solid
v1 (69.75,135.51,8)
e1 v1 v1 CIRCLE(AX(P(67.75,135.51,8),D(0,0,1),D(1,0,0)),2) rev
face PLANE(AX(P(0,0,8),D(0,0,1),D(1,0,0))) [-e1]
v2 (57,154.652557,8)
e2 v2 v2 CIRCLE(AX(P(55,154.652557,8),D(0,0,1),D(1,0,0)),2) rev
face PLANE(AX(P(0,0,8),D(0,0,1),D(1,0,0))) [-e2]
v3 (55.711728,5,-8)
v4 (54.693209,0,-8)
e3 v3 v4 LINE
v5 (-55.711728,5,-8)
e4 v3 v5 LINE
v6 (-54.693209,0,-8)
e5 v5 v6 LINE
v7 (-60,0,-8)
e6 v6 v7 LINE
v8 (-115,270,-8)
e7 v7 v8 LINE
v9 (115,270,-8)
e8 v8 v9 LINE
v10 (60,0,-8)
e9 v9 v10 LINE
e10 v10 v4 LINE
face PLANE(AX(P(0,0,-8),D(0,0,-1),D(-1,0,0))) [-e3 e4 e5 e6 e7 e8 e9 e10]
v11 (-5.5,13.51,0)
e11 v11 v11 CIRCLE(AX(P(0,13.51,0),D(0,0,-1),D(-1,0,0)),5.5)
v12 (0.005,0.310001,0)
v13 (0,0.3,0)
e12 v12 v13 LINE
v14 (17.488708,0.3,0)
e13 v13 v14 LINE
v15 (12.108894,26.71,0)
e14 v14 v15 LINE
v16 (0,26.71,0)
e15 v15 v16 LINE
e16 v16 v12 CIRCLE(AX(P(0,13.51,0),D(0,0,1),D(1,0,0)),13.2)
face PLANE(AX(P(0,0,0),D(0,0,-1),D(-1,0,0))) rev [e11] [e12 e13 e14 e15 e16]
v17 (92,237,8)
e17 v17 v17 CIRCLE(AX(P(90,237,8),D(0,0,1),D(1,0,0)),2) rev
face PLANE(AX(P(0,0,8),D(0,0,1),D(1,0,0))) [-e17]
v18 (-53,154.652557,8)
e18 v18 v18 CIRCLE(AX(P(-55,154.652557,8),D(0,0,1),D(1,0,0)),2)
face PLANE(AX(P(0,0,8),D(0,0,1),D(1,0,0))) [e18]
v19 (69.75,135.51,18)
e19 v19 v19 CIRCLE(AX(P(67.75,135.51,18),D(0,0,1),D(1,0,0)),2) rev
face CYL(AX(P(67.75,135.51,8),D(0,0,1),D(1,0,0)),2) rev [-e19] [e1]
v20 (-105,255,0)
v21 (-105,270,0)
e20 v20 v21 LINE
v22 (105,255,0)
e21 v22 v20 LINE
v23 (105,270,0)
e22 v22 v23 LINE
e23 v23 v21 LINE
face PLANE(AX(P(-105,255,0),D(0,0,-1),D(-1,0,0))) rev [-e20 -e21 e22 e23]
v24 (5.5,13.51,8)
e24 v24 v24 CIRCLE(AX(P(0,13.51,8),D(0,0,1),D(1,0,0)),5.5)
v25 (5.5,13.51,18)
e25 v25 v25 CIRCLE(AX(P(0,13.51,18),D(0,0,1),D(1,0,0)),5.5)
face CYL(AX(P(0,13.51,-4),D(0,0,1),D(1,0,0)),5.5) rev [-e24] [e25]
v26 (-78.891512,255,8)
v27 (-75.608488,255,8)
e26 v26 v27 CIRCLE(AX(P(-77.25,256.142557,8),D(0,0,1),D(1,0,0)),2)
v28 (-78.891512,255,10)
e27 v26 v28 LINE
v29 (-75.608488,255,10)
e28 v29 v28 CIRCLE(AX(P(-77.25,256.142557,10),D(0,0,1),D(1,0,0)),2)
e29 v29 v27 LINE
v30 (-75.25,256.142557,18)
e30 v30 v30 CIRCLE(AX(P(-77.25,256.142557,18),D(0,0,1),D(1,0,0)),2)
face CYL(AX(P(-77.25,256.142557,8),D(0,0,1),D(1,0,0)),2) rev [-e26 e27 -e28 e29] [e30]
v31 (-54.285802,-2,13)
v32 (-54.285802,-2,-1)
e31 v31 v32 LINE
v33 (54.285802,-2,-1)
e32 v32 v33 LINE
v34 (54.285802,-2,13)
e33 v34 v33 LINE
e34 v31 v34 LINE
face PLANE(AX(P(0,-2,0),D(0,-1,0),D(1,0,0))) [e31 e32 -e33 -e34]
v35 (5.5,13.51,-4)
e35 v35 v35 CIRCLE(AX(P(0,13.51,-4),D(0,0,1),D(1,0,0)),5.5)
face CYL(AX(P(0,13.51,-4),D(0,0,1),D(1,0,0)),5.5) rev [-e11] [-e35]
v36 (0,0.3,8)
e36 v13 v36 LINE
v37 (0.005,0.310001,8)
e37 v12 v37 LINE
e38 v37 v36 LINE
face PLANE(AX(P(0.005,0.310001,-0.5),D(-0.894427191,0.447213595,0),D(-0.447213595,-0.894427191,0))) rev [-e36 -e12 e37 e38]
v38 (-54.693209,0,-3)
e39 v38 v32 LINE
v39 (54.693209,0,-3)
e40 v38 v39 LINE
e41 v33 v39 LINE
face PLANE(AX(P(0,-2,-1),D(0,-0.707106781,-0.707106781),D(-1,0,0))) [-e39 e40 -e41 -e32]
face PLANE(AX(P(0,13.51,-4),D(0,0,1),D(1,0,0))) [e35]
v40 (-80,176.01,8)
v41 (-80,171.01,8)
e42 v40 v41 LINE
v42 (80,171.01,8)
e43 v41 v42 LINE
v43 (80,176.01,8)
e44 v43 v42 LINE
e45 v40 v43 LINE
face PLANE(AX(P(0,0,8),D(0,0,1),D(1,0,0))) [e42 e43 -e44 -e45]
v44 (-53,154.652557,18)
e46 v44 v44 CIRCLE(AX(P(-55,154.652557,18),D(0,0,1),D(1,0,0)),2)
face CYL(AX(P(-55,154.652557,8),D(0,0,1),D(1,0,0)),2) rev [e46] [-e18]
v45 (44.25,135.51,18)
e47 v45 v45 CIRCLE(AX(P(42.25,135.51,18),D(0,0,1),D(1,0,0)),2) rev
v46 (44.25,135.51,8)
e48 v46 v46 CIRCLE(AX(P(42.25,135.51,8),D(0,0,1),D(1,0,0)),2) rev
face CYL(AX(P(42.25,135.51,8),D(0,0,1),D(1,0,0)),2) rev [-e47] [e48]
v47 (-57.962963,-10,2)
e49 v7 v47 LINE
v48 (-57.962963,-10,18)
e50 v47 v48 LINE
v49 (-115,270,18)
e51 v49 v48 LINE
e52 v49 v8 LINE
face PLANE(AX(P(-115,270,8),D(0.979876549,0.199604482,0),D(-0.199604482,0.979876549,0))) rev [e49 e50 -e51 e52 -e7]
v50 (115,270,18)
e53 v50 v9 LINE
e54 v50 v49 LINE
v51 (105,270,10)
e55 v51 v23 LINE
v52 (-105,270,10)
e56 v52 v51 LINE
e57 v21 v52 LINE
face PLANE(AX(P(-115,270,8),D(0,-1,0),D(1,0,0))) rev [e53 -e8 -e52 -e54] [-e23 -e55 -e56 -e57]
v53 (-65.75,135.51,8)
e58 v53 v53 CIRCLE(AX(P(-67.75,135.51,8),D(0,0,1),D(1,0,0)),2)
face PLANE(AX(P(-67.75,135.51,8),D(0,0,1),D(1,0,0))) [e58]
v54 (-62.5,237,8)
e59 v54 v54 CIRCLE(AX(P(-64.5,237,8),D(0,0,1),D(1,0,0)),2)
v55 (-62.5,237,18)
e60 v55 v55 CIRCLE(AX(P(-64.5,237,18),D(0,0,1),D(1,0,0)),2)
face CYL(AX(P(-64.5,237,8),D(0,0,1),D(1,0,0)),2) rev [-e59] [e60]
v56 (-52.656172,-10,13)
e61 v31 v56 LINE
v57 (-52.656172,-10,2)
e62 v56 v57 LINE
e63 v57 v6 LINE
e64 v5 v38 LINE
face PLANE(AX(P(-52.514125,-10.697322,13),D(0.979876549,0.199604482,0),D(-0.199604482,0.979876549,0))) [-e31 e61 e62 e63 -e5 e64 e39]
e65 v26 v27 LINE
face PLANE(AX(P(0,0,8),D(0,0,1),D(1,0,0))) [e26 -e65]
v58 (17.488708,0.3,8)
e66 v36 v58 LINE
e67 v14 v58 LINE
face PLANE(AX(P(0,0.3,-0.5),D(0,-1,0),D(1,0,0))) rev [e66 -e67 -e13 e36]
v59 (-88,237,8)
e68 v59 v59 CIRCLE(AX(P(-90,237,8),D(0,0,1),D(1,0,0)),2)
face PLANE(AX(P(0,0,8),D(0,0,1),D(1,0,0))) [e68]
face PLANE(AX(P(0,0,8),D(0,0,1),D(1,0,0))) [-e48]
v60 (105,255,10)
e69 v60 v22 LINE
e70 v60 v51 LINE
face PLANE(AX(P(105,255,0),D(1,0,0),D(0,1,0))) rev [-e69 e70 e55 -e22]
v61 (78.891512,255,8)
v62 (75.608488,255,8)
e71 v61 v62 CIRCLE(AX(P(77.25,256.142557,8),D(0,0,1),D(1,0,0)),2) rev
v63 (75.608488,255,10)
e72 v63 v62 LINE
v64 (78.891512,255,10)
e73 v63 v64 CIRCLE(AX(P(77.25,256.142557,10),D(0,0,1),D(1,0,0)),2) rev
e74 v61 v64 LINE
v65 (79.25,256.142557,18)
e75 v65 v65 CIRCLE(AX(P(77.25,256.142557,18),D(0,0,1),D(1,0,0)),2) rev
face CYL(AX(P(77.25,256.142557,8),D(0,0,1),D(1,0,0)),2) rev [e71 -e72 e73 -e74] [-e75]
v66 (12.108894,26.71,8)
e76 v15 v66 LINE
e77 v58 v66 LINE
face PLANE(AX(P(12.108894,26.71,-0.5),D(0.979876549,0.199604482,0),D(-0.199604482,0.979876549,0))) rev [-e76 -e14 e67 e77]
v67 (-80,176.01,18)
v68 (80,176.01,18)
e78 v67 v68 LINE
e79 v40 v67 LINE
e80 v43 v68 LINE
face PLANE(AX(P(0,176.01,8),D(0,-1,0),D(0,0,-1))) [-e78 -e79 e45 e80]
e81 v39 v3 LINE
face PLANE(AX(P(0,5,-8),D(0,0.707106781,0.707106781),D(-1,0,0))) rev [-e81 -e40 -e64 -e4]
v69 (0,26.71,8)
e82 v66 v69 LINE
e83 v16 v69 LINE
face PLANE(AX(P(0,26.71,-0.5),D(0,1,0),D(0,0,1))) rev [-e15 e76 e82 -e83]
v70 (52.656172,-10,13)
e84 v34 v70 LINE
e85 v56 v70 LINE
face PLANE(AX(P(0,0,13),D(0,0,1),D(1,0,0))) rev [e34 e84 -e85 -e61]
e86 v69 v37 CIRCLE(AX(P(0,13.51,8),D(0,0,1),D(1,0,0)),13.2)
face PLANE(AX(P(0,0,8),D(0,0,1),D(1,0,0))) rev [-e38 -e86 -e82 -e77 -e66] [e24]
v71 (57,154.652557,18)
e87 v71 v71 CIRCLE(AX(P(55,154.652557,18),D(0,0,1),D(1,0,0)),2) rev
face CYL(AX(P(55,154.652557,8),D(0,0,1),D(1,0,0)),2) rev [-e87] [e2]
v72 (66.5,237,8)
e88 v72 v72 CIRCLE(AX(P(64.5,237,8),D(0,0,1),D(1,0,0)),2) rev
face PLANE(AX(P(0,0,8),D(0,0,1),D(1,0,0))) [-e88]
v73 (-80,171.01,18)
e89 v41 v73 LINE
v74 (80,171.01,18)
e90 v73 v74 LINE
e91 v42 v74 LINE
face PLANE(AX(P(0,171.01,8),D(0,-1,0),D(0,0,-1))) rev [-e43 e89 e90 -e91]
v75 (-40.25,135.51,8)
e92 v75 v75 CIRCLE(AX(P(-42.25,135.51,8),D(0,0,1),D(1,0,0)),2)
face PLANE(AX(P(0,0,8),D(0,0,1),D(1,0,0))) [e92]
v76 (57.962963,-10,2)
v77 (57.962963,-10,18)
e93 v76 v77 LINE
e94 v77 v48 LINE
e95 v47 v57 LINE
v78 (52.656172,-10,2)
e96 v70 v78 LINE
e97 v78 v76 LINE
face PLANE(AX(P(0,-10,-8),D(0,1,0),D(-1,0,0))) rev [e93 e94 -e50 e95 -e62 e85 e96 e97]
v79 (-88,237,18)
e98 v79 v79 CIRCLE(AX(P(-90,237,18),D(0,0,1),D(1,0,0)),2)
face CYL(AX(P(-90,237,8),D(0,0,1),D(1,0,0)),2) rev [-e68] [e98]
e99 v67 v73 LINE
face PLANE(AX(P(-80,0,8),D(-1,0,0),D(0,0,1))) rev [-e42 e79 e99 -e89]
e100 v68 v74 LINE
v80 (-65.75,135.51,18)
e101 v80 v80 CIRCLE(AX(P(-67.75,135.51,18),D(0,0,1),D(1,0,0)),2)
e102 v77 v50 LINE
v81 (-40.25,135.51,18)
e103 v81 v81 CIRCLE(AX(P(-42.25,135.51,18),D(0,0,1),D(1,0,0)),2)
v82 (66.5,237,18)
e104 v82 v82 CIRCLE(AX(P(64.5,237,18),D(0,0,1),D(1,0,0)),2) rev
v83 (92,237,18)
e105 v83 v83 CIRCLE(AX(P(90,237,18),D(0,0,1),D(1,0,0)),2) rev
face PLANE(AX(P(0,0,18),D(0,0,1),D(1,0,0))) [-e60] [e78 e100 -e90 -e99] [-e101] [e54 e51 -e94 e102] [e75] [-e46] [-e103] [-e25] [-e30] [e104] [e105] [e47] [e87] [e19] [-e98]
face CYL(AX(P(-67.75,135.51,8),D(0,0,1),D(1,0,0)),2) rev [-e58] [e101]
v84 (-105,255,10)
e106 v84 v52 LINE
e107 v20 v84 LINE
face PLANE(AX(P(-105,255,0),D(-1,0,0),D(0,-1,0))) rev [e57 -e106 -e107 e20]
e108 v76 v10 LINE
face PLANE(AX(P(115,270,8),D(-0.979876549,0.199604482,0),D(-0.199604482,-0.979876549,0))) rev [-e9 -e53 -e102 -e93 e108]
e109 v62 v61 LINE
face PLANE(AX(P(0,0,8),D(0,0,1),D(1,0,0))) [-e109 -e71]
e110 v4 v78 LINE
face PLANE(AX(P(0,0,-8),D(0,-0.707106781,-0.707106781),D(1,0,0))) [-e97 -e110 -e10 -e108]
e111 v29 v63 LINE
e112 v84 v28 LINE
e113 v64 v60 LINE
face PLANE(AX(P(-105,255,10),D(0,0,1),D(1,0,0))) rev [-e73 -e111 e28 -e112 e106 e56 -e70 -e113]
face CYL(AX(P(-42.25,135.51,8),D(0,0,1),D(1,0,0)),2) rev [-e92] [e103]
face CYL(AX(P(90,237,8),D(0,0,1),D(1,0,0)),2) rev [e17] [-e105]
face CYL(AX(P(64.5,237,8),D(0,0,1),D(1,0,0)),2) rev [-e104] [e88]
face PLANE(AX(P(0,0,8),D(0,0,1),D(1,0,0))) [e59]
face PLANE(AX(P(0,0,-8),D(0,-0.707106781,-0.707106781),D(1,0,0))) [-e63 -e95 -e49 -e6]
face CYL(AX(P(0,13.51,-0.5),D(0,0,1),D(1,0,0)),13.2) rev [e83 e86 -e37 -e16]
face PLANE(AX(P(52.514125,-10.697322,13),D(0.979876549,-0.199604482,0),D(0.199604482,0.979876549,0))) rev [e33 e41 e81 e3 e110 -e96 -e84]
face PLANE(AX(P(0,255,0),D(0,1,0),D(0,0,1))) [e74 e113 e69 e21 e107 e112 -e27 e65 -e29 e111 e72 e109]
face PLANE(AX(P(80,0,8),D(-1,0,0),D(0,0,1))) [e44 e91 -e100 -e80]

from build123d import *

# Parameters (mm, degrees)
EXTRUDE_1_DEPTH     = 8
CUT_EXTRUDE_1_DEPTH = 8.5
EXTRUDE_2_DEPTH     = 8
EXTRUDE_3_DEPTH     = 10
SKETCH_7_R          = 5.5
CUT_EXTRUDE_2_DEPTH = 22
EXTRUDE_5_DEPTH     = 26
CUT_EXTRUDE_4_DEPTH = 21
CHAMFER_6_SIZE      = 5
CHAMFER_8_SIZE      = 10
SKETCH_13_W         = 210
SKETCH_13_H         = 10
CUT_EXTRUDE_5_DEPTH = 15
SKETCH_14_W         = 160
SKETCH_14_H         = 5
CUT_EXTRUDE_6_DEPTH = 10
SKETCH_16_R         = 2
CUT_EXTRUDE_7_DEPTH = 10
SKETCH_18_W         = 109.386418102
SKETCH_18_H         = 16
EXTRUDE_7_DEPTH     = 2
CHAMFER_10_SIZE     = 2


with BuildPart() as part:
    # 草图1 → 凸台-拉伸1 (new body)
    with BuildSketch(Plane.XY):
        Polygon((-60, 0), (60, 0), (115, 270), (-115, 270), align=None)
    extrude(amount=EXTRUDE_1_DEPTH)

    # 草图2 → 切除-拉伸1 (cut)
    with BuildSketch(Plane.XY.offset(8)):
        with BuildLine():
            Line((0.005000474, 0.310000947), (0, 0.3))
            Line((0, 0.3), (17.48870838, 0.3))
            Line((17.48870838, 0.3), (12.108893566, 26.71))
            Line((12.108893566, 26.71), (0, 26.71))
            ThreePointArc((0, 26.71), (-13.199999763, 13.507499763), (0.005000474, 0.310000947))
        make_face()
    extrude(amount=-CUT_EXTRUDE_1_DEPTH, mode=Mode.SUBTRACT)

    # 草图5 → 凸台-拉伸2 (add)
    with BuildSketch(Plane(origin=(0, 0, 0), x_dir=(-1, 0, 0), z_dir=(0, 0, -1))):
        Polygon((60, 0), (115, 270), (-115, 270), (-60, 0), align=None)
    extrude(amount=EXTRUDE_2_DEPTH)

    # 草图6 → 凸台-拉伸3 (add)
    with BuildSketch(Plane.XY.offset(8)):
        Polygon((-115, 270), (-60, 0), (60, 0), (115, 270), align=None)
    extrude(amount=EXTRUDE_3_DEPTH)

    # 草图7 → 切除-拉伸2 (cut)
    with BuildSketch(Plane.XY.offset(18)):
        with Locations((0, 13.51)):
            Circle(SKETCH_7_R)
    extrude(amount=-CUT_EXTRUDE_2_DEPTH, mode=Mode.SUBTRACT)

    # 草图9 → 凸台-拉伸5 (add)
    with BuildSketch(Plane.XY.offset(18)):
        Polygon((-57.962962963, -10), (-60, 0), (60, 0), (57.962962963, -10), align=None)
    extrude(amount=-EXTRUDE_5_DEPTH)

    # 草图12 → 切除-拉伸4 (cut)
    with BuildSketch(Plane.XY.offset(-8)):
        Polygon((54.693209051, 0), (-54.693209051, 0), (-52.656172014, -10), (52.656172014, -10), align=None)
    extrude(amount=CUT_EXTRUDE_4_DEPTH, mode=Mode.SUBTRACT)

    # 倒角6
    chamfer_6_edges = [part.edges().sort_by_distance(p)[0] for p in [
        (0, 0, -8),
    ]]
    chamfer(chamfer_6_edges, length=CHAMFER_6_SIZE)

    # 倒角8
    chamfer_8_edges = [part.edges().sort_by_distance(p)[0] for p in [
        (55.309567488, -10, -8),
        (-55.309567488, -10, -8),
    ]]
    chamfer(chamfer_8_edges, length=CHAMFER_8_SIZE)

    # 草图13 → 切除-拉伸5 (cut)
    with BuildSketch(Plane(origin=(0, 270, 0), x_dir=(1, 0, 0), z_dir=(0, 1, 0))):
        with Locations((0, -5)):
            Rectangle(SKETCH_13_W, SKETCH_13_H)
    extrude(amount=-CUT_EXTRUDE_5_DEPTH, mode=Mode.SUBTRACT)

    # 草图14 → 切除-拉伸6 (cut)
    with BuildSketch(Plane.XY.offset(18)):
        with Locations((0, 173.51)):
            Rectangle(SKETCH_14_W, SKETCH_14_H)
    extrude(amount=-CUT_EXTRUDE_6_DEPTH, mode=Mode.SUBTRACT)

    # 草图16 → 切除-拉伸7 (cut)
    with BuildSketch(Plane.XY.offset(18)):
        with Locations((-77.25, 256.1425573)):
            Circle(SKETCH_16_R)
        with Locations((-90, 237)):
            Circle(SKETCH_16_R)
        with Locations((-64.5, 237)):
            Circle(SKETCH_16_R)
        with Locations((77.25, 256.1425573)):
            Circle(SKETCH_16_R)
        with Locations((64.5, 237)):
            Circle(SKETCH_16_R)
        with Locations((90, 237)):
            Circle(SKETCH_16_R)
        with Locations((-55, 154.6525573)):
            Circle(SKETCH_16_R)
        with Locations((-42.25, 135.51)):
            Circle(SKETCH_16_R)
        with Locations((55, 154.6525573)):
            Circle(SKETCH_16_R)
        with Locations((42.25, 135.51)):
            Circle(SKETCH_16_R)
        with Locations((67.75, 135.51)):
            Circle(SKETCH_16_R)
        with Locations((-67.75, 135.51)):
            Circle(SKETCH_16_R)
    extrude(amount=-CUT_EXTRUDE_7_DEPTH, mode=Mode.SUBTRACT)

    # 草图18 → 凸台-拉伸7 (add)
    with BuildSketch(Plane.XZ):
        with Locations((0, 5)):
            Rectangle(SKETCH_18_W, SKETCH_18_H)
    extrude(amount=EXTRUDE_7_DEPTH)

    # 倒角10
    chamfer_10_edges = [part.edges().sort_by_distance(p)[0] for p in [
        (0, -2, -3),
    ]]
    chamfer(chamfer_10_edges, length=CHAMFER_10_SIZE - 0.0001)  # a hair under: the kernel refuses the full size


solid = part.part
